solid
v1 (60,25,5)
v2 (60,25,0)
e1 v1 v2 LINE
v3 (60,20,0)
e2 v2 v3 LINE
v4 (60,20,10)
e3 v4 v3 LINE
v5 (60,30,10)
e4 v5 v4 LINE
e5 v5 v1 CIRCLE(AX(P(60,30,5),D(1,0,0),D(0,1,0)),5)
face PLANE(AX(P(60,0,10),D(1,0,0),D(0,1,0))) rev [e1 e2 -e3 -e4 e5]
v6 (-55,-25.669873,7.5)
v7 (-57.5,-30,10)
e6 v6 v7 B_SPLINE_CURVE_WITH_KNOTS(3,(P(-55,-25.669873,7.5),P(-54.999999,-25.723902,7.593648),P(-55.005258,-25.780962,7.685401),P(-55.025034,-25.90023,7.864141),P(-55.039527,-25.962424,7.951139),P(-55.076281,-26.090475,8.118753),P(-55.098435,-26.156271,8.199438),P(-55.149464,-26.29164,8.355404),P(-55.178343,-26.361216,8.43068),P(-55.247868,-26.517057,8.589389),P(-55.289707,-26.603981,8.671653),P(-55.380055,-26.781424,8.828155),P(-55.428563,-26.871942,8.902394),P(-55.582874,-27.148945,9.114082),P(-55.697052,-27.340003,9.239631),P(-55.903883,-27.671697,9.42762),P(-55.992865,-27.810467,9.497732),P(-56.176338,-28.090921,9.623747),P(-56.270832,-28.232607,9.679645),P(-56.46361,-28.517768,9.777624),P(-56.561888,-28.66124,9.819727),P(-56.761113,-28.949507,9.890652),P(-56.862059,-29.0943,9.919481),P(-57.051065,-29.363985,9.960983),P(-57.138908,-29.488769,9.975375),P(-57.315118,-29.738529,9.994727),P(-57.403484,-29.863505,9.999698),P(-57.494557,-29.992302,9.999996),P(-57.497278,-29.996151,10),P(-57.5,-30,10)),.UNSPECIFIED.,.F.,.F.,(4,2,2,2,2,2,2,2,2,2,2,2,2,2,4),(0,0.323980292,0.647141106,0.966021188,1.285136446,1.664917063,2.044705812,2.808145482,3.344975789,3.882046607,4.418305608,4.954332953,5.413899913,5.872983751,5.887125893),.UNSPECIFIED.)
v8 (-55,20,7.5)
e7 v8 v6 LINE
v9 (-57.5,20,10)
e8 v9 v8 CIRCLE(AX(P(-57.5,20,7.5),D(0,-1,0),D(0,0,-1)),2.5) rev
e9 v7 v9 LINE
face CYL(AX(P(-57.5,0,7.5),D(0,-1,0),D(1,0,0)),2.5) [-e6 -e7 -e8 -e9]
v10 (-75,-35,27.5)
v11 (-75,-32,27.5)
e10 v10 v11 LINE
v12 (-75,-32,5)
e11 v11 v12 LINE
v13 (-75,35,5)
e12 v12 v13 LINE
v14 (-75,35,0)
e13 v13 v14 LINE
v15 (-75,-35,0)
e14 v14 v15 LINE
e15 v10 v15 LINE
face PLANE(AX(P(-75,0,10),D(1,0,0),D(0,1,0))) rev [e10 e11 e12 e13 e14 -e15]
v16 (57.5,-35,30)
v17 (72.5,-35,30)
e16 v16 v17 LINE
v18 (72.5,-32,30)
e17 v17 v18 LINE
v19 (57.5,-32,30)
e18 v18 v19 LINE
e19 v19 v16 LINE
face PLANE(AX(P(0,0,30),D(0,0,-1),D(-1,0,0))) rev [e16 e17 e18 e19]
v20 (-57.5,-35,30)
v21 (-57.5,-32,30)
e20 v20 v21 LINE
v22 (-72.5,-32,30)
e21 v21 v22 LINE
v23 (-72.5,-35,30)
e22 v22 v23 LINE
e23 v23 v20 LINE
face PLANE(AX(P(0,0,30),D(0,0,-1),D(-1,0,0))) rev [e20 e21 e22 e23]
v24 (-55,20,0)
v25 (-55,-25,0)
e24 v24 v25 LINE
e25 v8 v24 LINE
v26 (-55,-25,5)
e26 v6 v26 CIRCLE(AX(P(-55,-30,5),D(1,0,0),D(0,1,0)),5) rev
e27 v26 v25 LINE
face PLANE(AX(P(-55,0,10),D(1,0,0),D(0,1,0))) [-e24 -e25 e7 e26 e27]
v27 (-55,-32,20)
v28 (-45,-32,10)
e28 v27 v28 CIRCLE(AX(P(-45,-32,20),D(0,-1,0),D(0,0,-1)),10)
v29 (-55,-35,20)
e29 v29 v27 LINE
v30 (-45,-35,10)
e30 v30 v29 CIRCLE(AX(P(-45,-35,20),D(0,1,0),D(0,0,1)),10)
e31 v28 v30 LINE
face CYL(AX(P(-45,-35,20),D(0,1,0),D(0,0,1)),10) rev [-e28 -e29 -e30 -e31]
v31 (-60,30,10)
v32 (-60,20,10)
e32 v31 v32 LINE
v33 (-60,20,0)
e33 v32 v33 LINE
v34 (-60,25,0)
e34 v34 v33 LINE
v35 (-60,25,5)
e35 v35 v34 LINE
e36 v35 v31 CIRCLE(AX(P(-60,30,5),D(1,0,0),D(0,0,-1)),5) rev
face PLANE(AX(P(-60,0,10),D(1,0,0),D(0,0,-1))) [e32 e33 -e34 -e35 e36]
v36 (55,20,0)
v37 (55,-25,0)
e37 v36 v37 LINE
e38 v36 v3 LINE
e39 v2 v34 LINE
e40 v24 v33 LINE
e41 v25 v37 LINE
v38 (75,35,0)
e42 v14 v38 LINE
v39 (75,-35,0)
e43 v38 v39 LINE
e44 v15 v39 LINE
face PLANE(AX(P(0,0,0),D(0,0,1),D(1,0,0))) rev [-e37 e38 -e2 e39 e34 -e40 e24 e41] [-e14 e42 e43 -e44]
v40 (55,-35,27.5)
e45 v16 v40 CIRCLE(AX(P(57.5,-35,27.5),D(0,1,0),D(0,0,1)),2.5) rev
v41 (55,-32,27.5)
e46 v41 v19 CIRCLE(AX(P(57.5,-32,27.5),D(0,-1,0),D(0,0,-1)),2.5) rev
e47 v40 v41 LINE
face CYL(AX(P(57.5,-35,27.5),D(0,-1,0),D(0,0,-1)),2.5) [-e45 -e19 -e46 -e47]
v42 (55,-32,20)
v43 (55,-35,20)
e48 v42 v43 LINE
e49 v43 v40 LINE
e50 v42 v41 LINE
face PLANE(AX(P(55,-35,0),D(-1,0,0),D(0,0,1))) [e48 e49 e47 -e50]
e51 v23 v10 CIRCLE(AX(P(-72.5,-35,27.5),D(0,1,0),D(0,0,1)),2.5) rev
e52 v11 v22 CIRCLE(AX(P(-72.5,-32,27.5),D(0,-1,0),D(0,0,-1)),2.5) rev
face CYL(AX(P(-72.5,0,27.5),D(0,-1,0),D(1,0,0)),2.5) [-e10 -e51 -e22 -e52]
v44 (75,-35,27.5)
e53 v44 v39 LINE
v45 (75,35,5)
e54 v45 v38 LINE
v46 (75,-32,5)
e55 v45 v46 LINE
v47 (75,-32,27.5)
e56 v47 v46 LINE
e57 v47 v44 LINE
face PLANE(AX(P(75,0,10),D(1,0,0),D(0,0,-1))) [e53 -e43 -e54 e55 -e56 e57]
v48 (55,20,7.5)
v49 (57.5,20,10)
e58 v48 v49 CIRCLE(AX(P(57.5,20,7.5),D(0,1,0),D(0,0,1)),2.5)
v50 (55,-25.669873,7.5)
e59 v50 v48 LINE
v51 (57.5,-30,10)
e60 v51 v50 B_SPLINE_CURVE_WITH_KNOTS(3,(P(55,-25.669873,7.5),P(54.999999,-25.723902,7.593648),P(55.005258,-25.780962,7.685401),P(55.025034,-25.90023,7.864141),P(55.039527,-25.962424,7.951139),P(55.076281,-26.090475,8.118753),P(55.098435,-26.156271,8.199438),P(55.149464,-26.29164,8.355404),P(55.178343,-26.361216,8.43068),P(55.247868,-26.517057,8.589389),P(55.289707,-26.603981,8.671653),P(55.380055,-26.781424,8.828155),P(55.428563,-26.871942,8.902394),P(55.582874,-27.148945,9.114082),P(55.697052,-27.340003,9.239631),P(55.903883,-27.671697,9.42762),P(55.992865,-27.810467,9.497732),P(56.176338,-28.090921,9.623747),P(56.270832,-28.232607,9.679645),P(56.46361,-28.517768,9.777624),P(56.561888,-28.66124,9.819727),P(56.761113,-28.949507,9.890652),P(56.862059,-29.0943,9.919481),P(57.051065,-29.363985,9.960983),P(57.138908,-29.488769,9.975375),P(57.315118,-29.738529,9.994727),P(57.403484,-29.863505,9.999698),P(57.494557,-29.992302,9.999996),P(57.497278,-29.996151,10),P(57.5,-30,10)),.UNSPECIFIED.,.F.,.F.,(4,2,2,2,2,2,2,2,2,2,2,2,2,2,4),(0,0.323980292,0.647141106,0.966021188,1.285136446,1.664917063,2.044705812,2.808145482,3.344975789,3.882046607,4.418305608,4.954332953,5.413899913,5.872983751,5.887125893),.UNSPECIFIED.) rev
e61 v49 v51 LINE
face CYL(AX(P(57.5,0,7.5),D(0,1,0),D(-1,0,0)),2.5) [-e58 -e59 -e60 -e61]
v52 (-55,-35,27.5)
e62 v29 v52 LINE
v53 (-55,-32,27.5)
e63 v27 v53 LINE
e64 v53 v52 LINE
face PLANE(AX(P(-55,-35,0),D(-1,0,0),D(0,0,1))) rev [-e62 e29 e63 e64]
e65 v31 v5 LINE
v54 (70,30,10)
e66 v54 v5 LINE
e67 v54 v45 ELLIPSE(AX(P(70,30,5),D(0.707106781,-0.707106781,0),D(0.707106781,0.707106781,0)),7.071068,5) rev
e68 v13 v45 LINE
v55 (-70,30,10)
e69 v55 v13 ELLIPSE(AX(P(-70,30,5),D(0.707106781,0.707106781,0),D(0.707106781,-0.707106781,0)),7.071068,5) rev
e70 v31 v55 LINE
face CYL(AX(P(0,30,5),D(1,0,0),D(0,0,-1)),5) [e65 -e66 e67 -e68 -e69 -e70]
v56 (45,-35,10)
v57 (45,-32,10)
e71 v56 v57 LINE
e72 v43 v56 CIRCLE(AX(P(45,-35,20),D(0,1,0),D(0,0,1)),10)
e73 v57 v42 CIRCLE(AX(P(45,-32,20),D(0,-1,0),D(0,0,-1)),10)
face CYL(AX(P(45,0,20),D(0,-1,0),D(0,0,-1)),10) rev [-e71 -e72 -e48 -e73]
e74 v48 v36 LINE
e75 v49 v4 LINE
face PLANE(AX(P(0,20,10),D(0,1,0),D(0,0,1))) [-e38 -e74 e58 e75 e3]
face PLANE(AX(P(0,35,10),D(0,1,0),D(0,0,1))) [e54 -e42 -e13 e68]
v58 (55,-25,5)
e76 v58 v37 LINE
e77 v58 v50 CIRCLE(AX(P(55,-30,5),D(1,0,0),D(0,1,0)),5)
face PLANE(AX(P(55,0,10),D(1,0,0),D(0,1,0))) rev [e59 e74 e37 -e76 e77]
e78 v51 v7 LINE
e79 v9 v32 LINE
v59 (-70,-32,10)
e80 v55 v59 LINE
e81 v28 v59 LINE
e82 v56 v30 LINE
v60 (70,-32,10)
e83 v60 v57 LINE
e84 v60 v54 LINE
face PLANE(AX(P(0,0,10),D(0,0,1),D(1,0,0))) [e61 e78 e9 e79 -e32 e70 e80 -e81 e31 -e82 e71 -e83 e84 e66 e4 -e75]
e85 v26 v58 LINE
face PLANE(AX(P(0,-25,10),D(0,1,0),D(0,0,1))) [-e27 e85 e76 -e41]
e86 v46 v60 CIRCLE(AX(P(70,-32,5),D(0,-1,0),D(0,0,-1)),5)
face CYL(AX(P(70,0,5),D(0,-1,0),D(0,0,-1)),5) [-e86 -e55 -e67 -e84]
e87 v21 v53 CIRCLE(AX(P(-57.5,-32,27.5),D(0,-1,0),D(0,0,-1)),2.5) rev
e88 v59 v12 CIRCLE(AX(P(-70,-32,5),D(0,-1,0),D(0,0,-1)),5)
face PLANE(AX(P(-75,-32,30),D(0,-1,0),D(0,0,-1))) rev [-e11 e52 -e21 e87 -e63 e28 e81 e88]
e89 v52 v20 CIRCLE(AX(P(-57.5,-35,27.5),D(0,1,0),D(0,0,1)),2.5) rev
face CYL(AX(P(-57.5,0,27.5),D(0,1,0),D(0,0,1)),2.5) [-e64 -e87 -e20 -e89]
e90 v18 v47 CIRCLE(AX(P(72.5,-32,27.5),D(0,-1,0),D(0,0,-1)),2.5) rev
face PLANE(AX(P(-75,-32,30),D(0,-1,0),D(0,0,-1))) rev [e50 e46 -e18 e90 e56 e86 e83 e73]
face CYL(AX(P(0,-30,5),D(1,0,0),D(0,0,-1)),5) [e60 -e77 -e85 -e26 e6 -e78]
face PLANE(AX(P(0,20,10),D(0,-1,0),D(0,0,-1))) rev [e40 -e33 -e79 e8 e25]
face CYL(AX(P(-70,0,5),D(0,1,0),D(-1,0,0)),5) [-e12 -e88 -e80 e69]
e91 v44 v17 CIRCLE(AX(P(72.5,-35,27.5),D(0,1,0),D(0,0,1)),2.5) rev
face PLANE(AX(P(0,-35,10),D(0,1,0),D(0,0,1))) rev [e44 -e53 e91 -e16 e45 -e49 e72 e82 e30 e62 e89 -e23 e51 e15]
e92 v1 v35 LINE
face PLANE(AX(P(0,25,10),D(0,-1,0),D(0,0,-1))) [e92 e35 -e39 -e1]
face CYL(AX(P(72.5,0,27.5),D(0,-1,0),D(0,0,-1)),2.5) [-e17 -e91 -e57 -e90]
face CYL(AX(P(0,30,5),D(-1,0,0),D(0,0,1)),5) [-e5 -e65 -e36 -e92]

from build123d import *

# Parameters (mm, degrees)
SKETCH1_W           = 150
SKETCH1_H           = 70
BOSS_EXTRUDE1_DEPTH = 10
SKETCH2_W           = 150
SKETCH2_H           = 3
BOSS_EXTRUDE2_DEPTH = 20
SKETCH3_W           = 110
SKETCH3_H           = 20
CUT_EXTRUDE1_DEPTH  = 105.947605976
FILLET1_R           = 5
FILLET2_R           = 10
FILLET3_R           = 2.5


with BuildPart() as part:
    # Sketch1 → Boss-Extrude1 (new body)
    with BuildSketch(Plane.XY):
        Rectangle(SKETCH1_W, SKETCH1_H)
        Polygon((-60, 25), (-55, 25), (55, 25), (60, 25), (60, 20), (55, 20), (55, -25), (-55, -25), (-55, 20), (-60, 20), align=None, mode=Mode.SUBTRACT)
    extrude(amount=BOSS_EXTRUDE1_DEPTH)

    # Sketch2 → Boss-Extrude2 (add)
    with BuildSketch(Plane.XY.offset(10)):
        with Locations((0, -33.5)):
            Rectangle(SKETCH2_W, SKETCH2_H)
    extrude(amount=BOSS_EXTRUDE2_DEPTH)

    # Sketch3 → Cut-Extrude1 (cut, through all)
    with BuildSketch(Plane(origin=(0, -32, 0), x_dir=(1, 0, 0), z_dir=(0, 1, 0))):
        with Locations((0, -20)):
            Rectangle(SKETCH3_W, SKETCH3_H)
    extrude(amount=-CUT_EXTRUDE1_DEPTH, mode=Mode.SUBTRACT)

    # Fillet1
    fillet1_edges = [part.edges().sort_by_distance(p)[0] for p in [
        (0, 25, 10),
        (0, -25, 10),
        (75, 1.5, 10),
        (0, 35, 10),
        (-75, 1.5, 10),
    ]]
    fillet(fillet1_edges, radius=FILLET1_R - 0.0001)  # a hair under: the kernel refuses the full size

    # Fillet2
    fillet2_edges = [part.edges().sort_by_distance(p)[0] for p in [
        (55, -33.5, 10),
        (-55, -33.5, 10),
    ]]
    fillet(fillet2_edges, radius=FILLET2_R)

    # Fillet3
    fillet3_edges = [part.edges().sort_by_distance(p)[0] for p in [
        (55, -4.99995, 10),
        (-55, -4.99995, 10),
        (-75, -33.5, 30),
        (75, -33.5, 30),
        (55, -33.5, 30),
        (-55, -33.5, 30),
    ]]
    fillet(fillet3_edges, radius=FILLET3_R)


solid = part.part
